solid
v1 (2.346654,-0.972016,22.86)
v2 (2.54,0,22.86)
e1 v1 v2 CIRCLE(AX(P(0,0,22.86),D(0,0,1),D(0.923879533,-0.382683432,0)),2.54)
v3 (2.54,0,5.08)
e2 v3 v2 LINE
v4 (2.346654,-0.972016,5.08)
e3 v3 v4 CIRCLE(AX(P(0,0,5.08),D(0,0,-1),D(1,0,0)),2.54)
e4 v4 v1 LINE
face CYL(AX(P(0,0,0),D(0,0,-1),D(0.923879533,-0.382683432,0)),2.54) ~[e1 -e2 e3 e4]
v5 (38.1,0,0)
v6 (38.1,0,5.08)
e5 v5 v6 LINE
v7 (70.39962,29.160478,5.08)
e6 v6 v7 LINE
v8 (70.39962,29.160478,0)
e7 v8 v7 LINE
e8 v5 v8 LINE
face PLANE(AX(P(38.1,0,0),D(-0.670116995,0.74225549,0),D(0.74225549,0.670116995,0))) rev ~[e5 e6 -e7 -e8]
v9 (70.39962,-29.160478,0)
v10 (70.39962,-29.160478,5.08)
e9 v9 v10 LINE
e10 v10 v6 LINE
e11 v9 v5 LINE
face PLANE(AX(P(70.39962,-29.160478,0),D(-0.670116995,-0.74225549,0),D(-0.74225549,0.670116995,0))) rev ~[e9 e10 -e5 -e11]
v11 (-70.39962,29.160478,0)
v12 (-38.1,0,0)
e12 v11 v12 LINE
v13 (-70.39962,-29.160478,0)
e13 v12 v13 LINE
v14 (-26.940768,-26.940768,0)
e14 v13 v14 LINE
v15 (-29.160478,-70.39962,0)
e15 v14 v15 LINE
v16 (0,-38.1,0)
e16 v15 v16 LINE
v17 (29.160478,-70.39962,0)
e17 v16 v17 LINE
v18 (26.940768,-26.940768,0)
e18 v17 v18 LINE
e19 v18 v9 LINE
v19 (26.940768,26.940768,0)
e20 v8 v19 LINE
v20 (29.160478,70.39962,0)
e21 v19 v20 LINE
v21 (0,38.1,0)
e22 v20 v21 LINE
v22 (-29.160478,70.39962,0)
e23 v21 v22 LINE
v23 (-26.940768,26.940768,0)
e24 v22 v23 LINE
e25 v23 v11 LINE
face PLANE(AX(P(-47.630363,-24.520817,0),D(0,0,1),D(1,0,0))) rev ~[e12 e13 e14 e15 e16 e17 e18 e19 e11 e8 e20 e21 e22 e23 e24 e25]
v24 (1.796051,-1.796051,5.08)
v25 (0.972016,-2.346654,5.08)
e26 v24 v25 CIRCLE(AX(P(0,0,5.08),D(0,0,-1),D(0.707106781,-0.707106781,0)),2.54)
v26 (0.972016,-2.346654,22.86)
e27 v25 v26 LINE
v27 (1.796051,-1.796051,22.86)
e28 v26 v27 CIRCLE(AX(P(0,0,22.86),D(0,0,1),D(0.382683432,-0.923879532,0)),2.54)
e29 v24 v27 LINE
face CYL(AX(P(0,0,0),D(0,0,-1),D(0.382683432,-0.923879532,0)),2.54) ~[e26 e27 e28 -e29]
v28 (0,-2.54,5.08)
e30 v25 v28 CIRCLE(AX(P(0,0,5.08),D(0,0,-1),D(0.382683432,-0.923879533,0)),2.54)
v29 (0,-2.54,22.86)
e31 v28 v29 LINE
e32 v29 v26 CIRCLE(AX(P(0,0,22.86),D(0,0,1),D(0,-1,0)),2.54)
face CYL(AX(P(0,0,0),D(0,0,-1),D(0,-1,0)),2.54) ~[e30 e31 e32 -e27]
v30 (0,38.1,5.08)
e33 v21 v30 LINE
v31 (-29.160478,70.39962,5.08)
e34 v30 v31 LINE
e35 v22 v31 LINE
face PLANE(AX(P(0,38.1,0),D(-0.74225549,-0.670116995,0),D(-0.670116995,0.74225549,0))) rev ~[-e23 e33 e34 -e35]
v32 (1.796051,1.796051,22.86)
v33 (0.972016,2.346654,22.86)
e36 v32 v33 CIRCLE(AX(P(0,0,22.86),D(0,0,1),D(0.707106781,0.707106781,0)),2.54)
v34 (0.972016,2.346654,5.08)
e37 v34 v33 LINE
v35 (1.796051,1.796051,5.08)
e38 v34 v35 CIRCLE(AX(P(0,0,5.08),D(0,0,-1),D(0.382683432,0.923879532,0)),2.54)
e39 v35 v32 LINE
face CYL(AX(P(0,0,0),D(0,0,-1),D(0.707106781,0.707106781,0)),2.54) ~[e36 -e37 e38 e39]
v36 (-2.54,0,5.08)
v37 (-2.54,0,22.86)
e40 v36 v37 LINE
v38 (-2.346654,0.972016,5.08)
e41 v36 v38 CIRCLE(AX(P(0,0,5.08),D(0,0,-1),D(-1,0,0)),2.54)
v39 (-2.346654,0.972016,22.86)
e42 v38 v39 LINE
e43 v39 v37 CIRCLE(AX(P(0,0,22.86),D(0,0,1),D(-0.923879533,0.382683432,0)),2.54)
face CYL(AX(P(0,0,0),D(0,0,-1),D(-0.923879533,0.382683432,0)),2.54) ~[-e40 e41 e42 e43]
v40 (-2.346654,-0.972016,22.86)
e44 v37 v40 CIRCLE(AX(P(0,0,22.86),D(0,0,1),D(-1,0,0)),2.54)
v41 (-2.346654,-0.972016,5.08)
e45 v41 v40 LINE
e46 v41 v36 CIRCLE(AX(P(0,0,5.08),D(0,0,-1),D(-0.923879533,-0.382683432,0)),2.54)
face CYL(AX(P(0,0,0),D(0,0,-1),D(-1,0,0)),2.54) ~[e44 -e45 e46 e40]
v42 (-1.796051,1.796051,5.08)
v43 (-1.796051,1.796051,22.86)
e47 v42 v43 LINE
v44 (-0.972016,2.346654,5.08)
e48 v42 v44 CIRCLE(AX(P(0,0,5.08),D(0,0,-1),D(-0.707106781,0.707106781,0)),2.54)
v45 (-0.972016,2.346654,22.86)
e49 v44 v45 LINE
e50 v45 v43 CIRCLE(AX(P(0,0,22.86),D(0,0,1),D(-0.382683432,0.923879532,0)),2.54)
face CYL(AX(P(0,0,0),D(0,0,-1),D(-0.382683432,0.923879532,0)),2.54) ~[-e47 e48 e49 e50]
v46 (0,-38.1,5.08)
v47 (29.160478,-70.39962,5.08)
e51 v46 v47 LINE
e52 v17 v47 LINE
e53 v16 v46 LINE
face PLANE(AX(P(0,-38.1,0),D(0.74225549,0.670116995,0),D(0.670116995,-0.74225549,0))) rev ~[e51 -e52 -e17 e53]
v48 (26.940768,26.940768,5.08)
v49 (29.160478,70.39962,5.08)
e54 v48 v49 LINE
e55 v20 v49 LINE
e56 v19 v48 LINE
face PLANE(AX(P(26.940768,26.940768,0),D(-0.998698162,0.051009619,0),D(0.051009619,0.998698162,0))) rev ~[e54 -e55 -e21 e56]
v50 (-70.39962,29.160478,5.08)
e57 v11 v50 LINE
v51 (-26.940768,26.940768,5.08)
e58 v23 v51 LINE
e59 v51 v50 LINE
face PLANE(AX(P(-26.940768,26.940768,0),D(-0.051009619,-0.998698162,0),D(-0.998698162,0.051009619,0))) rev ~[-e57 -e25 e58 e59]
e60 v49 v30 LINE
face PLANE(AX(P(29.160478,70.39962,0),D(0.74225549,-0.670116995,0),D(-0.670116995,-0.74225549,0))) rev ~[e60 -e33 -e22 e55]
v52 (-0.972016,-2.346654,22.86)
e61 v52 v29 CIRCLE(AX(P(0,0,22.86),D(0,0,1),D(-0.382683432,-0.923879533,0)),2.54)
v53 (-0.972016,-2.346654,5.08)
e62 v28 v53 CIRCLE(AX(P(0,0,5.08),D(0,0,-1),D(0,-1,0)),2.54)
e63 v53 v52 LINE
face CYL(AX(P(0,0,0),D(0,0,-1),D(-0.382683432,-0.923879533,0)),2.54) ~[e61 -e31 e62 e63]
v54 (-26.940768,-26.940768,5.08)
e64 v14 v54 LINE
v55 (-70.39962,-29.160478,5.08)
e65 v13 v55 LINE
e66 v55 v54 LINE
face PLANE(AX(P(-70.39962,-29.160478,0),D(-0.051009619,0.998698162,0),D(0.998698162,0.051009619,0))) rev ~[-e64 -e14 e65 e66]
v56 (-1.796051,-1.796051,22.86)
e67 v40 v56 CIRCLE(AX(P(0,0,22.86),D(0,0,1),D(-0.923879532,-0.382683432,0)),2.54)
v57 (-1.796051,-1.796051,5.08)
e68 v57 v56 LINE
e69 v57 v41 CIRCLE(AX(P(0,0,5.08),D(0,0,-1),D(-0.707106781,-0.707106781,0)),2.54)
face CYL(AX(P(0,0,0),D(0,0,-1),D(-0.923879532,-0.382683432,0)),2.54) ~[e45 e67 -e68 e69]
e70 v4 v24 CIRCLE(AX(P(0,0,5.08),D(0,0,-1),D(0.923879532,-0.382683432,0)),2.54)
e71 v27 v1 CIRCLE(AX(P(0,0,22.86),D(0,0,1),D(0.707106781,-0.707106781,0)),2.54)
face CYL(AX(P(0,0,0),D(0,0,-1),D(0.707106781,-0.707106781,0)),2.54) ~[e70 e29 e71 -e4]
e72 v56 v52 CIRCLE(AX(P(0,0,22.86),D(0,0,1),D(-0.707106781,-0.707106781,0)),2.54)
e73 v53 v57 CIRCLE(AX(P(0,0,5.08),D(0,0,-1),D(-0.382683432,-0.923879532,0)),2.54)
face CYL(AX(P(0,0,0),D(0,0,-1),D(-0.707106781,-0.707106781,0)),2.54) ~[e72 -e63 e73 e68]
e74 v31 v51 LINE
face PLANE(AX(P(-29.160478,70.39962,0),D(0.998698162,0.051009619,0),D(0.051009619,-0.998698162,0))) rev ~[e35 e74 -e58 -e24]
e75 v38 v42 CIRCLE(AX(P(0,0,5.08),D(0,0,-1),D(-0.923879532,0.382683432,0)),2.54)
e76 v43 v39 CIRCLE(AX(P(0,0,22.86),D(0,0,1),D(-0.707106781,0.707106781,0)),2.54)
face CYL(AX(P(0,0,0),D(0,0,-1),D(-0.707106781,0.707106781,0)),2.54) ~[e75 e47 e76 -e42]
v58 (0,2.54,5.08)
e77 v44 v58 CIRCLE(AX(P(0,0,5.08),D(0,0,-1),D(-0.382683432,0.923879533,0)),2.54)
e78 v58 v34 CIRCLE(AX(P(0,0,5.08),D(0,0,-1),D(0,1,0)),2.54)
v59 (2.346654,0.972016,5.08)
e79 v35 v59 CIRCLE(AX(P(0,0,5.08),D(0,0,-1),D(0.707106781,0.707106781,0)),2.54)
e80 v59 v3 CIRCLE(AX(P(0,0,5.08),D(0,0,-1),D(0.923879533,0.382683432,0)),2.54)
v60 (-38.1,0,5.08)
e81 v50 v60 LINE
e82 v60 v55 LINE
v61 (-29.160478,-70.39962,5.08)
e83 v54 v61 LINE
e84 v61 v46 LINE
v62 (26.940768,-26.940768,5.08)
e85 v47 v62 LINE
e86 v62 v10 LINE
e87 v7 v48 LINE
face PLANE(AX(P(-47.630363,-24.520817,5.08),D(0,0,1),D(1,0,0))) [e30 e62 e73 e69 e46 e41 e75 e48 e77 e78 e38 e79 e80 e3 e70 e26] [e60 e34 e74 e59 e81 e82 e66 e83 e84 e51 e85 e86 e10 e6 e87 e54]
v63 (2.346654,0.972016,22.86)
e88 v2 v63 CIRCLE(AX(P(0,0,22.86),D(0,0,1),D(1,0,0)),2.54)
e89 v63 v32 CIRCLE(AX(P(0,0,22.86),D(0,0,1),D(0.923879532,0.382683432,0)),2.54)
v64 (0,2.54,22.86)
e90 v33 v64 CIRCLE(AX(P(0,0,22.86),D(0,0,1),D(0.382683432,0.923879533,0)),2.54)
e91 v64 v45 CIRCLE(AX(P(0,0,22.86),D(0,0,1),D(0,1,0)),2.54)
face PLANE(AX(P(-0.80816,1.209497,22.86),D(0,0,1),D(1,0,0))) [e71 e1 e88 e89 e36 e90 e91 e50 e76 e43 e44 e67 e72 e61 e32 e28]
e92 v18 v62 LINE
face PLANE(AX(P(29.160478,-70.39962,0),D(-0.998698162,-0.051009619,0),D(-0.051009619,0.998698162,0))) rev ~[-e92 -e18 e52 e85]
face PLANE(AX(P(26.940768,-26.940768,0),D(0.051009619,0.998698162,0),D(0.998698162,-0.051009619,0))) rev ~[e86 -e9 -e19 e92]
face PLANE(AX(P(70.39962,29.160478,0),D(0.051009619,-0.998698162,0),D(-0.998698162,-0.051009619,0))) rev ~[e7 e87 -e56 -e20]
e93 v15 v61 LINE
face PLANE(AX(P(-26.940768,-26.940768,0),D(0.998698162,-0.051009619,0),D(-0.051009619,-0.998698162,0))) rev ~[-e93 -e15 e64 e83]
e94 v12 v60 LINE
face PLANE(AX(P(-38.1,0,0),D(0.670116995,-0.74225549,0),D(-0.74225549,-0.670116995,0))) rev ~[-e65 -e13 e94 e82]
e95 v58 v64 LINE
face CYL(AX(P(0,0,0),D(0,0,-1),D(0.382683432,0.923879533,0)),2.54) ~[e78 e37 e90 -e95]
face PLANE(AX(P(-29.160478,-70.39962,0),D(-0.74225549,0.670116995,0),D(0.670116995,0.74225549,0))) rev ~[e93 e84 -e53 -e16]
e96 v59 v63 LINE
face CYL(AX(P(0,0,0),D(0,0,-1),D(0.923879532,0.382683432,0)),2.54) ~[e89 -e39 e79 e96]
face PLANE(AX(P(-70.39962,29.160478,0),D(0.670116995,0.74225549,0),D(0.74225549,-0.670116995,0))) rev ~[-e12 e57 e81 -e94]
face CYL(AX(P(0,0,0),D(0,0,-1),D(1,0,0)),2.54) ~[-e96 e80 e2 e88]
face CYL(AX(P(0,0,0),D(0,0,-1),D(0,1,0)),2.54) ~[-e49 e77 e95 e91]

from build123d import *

# Parameters (mm, degrees)
F1_DEPTH = 5.08
F2_DEPTH = 22.86


# Not quite as in the source:
# - a feature names something its author has since deleted; it is built from what else it names


with BuildPart() as f1:
    # F0 (on Top) → F1 (new body)
    with BuildSketch(Plane.XY):
        with BuildLine():
            Line((-70.3996203774, -29.1604775462), (-26.9407683632, -26.9407683632))
            ThreePointArc((-26.9407683632, -26.9407683632), (-31.6789922287, -21.167225878), (-35.1998101887, -14.5802387731))
            Line((-35.1998101887, -14.5802387731), (-70.3996203774, -29.1604775462))
        make_face()
        with BuildLine():
            ThreePointArc((-35.1998101887, -14.5802387731), (-37.3679191834, -7.4329412688), (-38.1, 0))
            Line((-38.1, 0), (-70.3996203774, -29.1604775462))
            Line((-70.3996203774, -29.1604775462), (-35.1998101887, -14.5802387731))
        make_face()
        with BuildLine():
            Line((-70.3996203774, 29.1604775462), (-38.1, 0))
            ThreePointArc((-38.1, 0), (-37.3679191834, 7.4329412688), (-35.1998101887, 14.5802387731))
            Line((-35.1998101887, 14.5802387731), (-70.3996203774, 29.1604775462))
        make_face()
        with BuildLine():
            ThreePointArc((-35.1998101887, 14.5802387731), (-31.6789922287, 21.167225878), (-26.9407683632, 26.9407683632))
            Line((-26.9407683632, 26.9407683632), (-70.3996203774, 29.1604775462))
            Line((-70.3996203774, 29.1604775462), (-35.1998101887, 14.5802387731))
        make_face()
        with BuildLine():
            Line((-14.5802387731, 35.1998101887), (-29.1604775462, 70.3996203774))
            Line((-29.1604775462, 70.3996203774), (-26.9407683632, 26.9407683632))
            ThreePointArc((-26.9407683632, 26.9407683632), (-21.167225878, 31.6789922287), (-14.5802387731, 35.1998101887))
        make_face()
        with BuildLine():
            ThreePointArc((-14.5802387731, 35.1998101887), (-7.4329412688, 37.3679191834), (0, 38.1))
            Line((0, 38.1), (-29.1604775462, 70.3996203774))
            Line((-29.1604775462, 70.3996203774), (-14.5802387731, 35.1998101887))
        make_face()
        with BuildLine():
            Line((14.5802387731, 35.1998101887), (29.1604775462, 70.3996203774))
            Line((29.1604775462, 70.3996203774), (0, 38.1))
            ThreePointArc((0, 38.1), (7.4329412688, 37.3679191834), (14.5802387731, 35.1998101887))
        make_face()
        with BuildLine():
            ThreePointArc((14.5802387731, 35.1998101887), (21.167225878, 31.6789922287), (26.9407683632, 26.9407683632))
            Line((26.9407683632, 26.9407683632), (29.1604775462, 70.3996203774))
            Line((29.1604775462, 70.3996203774), (14.5802387731, 35.1998101887))
        make_face()
        with BuildLine():
            Line((38.1, 0), (70.3996203774, 29.1604775462))
            Line((70.3996203774, 29.1604775462), (35.1998101887, 14.5802387731))
            ThreePointArc((35.1998101887, 14.5802387731), (37.3679191834, 7.4329412688), (38.1, 0))
        make_face()
        with BuildLine():
            Line((35.1998101887, -14.5802387731), (70.3996203774, -29.1604775462))
            Line((70.3996203774, -29.1604775462), (38.1, 0))
            ThreePointArc((38.1, 0), (37.3679191834, -7.4329412688), (35.1998101887, -14.5802387731))
        make_face()
        with BuildLine():
            Line((26.9407683632, -26.9407683632), (70.3996203774, -29.1604775462))
            Line((70.3996203774, -29.1604775462), (35.1998101887, -14.5802387731))
            ThreePointArc((35.1998101887, -14.5802387731), (31.6789922287, -21.167225878), (26.9407683632, -26.9407683632))
        make_face()
        with BuildLine():
            Line((29.1604775462, -70.3996203774), (26.9407683632, -26.9407683632))
            ThreePointArc((26.9407683632, -26.9407683632), (21.167225878, -31.6789922287), (14.5802387731, -35.1998101887))
            Line((14.5802387731, -35.1998101887), (29.1604775462, -70.3996203774))
        make_face()
        with BuildLine():
            Line((0, -38.1), (29.1604775462, -70.3996203774))
            Line((29.1604775462, -70.3996203774), (14.5802387731, -35.1998101887))
            ThreePointArc((14.5802387731, -35.1998101887), (7.4329412688, -37.3679191834), (0, -38.1))
        make_face()
        with BuildLine():
            Line((-29.1604775462, -70.3996203774), (0, -38.1))
            ThreePointArc((0, -38.1), (-7.4329412688, -37.3679191834), (-14.5802387731, -35.1998101887))
            Line((-14.5802387731, -35.1998101887), (-29.1604775462, -70.3996203774))
        make_face()
        with BuildLine():
            Line((-26.9407683632, -26.9407683632), (-29.1604775462, -70.3996203774))
            Line((-29.1604775462, -70.3996203774), (-14.5802387731, -35.1998101887))
            ThreePointArc((-14.5802387731, -35.1998101887), (-21.167225878, -31.6789922287), (-26.9407683632, -26.9407683632))
        make_face()
        with BuildLine():
            ThreePointArc((-0.9720159182, -2.3466540126), (-1.4111483919, -2.1119328152), (-1.7960512242, -1.7960512242))
            Line((-1.7960512242, -1.7960512242), (-26.9407683632, -26.9407683632))
            ThreePointArc((-26.9407683632, -26.9407683632), (-21.167225878, -31.6789922287), (-14.5802387731, -35.1998101887))
            Line((-14.5802387731, -35.1998101887), (-0.9720159182, -2.3466540126))
        make_face()
        with BuildLine():
            ThreePointArc((-14.5802387731, -35.1998101887), (-7.4329412688, -37.3679191834), (0, -38.1))
            Line((0, -38.1), (0, -2.54))
            ThreePointArc((0, -2.54), (-0.4955294179, -2.4911946122), (-0.9720159182, -2.3466540126))
            Line((-0.9720159182, -2.3466540126), (-14.5802387731, -35.1998101887))
        make_face()
        with BuildLine():
            ThreePointArc((0, -38.1), (7.4329412688, -37.3679191834), (14.5802387731, -35.1998101887))
            Line((14.5802387731, -35.1998101887), (0.9720159182, -2.3466540126))
            ThreePointArc((0.9720159182, -2.3466540126), (0.4955294179, -2.4911946122), (0, -2.54))
            Line((0, -2.54), (0, -38.1))
        make_face()
        with BuildLine():
            ThreePointArc((14.5802387731, -35.1998101887), (21.167225878, -31.6789922287), (26.9407683632, -26.9407683632))
            Line((26.9407683632, -26.9407683632), (1.7960512242, -1.7960512242))
            ThreePointArc((1.7960512242, -1.7960512242), (1.4111483919, -2.1119328152), (0.9720159182, -2.3466540126))
            Line((0.9720159182, -2.3466540126), (14.5802387731, -35.1998101887))
        make_face()
        with BuildLine():
            ThreePointArc((26.9407683632, -26.9407683632), (31.6789922287, -21.167225878), (35.1998101887, -14.5802387731))
            Line((35.1998101887, -14.5802387731), (2.3466540126, -0.9720159182))
            ThreePointArc((2.3466540126, -0.9720159182), (2.1119328152, -1.4111483919), (1.7960512242, -1.7960512242))
            Line((1.7960512242, -1.7960512242), (26.9407683632, -26.9407683632))
        make_face()
        with BuildLine():
            ThreePointArc((35.1998101887, -14.5802387731), (37.3679191834, -7.4329412688), (38.1, 0))
            Line((38.1, 0), (2.54, 0))
            ThreePointArc((2.54, 0), (2.4911946122, -0.4955294179), (2.3466540126, -0.9720159182))
            Line((2.3466540126, -0.9720159182), (35.1998101887, -14.5802387731))
        make_face()
        with BuildLine():
            Line((2.54, 0), (38.1, 0))
            ThreePointArc((38.1, 0), (37.3679191834, 7.4329412688), (35.1998101887, 14.5802387731))
            Line((35.1998101887, 14.5802387731), (2.3466540126, 0.9720159182))
            ThreePointArc((2.3466540126, 0.9720159182), (2.4911946122, 0.4955294179), (2.54, 0))
        make_face()
        with BuildLine():
            Line((2.3466540126, 0.9720159182), (35.1998101887, 14.5802387731))
            ThreePointArc((35.1998101887, 14.5802387731), (31.6789922287, 21.167225878), (26.9407683632, 26.9407683632))
            Line((26.9407683632, 26.9407683632), (1.7960512242, 1.7960512242))
            ThreePointArc((1.7960512242, 1.7960512242), (2.1119328152, 1.4111483919), (2.3466540126, 0.9720159182))
        make_face()
        with BuildLine():
            Line((1.7960512242, 1.7960512242), (26.9407683632, 26.9407683632))
            ThreePointArc((26.9407683632, 26.9407683632), (21.167225878, 31.6789922287), (14.5802387731, 35.1998101887))
            Line((14.5802387731, 35.1998101887), (0.9720159182, 2.3466540126))
            ThreePointArc((0.9720159182, 2.3466540126), (1.4111483919, 2.1119328152), (1.7960512242, 1.7960512242))
        make_face()
        with BuildLine():
            Line((0.9720159182, 2.3466540126), (14.5802387731, 35.1998101887))
            ThreePointArc((14.5802387731, 35.1998101887), (7.4329412688, 37.3679191834), (0, 38.1))
            Line((0, 38.1), (0, 2.54))
            ThreePointArc((0, 2.54), (0.4955294179, 2.4911946122), (0.9720159182, 2.3466540126))
        make_face()
        with BuildLine():
            Line((0, 2.54), (0, 38.1))
            ThreePointArc((0, 38.1), (-7.4329412688, 37.3679191834), (-14.5802387731, 35.1998101887))
            Line((-14.5802387731, 35.1998101887), (-0.9720159182, 2.3466540126))
            ThreePointArc((-0.9720159182, 2.3466540126), (-0.4955294179, 2.4911946122), (0, 2.54))
        make_face()
        with BuildLine():
            Line((-26.9407683632, 26.9407683632), (-1.7960512242, 1.7960512242))
            ThreePointArc((-1.7960512242, 1.7960512242), (-1.4111483919, 2.1119328152), (-0.9720159182, 2.3466540126))
            Line((-0.9720159182, 2.3466540126), (-14.5802387731, 35.1998101887))
            ThreePointArc((-14.5802387731, 35.1998101887), (-21.167225878, 31.6789922287), (-26.9407683632, 26.9407683632))
        make_face()
        with BuildLine():
            ThreePointArc((-2.3466540126, 0.9720159182), (-2.1119328152, 1.4111483919), (-1.7960512242, 1.7960512242))
            Line((-1.7960512242, 1.7960512242), (-26.9407683632, 26.9407683632))
            ThreePointArc((-26.9407683632, 26.9407683632), (-31.6789922287, 21.167225878), (-35.1998101887, 14.5802387731))
            Line((-35.1998101887, 14.5802387731), (-2.3466540126, 0.9720159182))
        make_face()
        with BuildLine():
            Line((-38.1, 0), (-2.54, 0))
            ThreePointArc((-2.54, 0), (-2.4911946122, 0.4955294179), (-2.3466540126, 0.9720159182))
            Line((-2.3466540126, 0.9720159182), (-35.1998101887, 14.5802387731))
            ThreePointArc((-35.1998101887, 14.5802387731), (-37.3679191834, 7.4329412688), (-38.1, 0))
        make_face()
        with BuildLine():
            ThreePointArc((-2.3466540126, -0.9720159182), (-2.4911946122, -0.4955294179), (-2.54, 0))
            Line((-2.54, 0), (-38.1, 0))
            ThreePointArc((-38.1, 0), (-37.3679191834, -7.4329412688), (-35.1998101887, -14.5802387731))
            Line((-35.1998101887, -14.5802387731), (-2.3466540126, -0.9720159182))
        make_face()
        with BuildLine():
            Line((-26.9407683632, -26.9407683632), (-1.7960512242, -1.7960512242))
            ThreePointArc((-1.7960512242, -1.7960512242), (-2.1119328152, -1.4111483919), (-2.3466540126, -0.9720159182))
            Line((-2.3466540126, -0.9720159182), (-35.1998101887, -14.5802387731))
            ThreePointArc((-35.1998101887, -14.5802387731), (-31.6789922287, -21.167225878), (-26.9407683632, -26.9407683632))
        make_face()
        with BuildLine():
            Line((35.1998101887, 14.5802387731), (70.3996203774, 29.1604775462))
            Line((70.3996203774, 29.1604775462), (26.9407683632, 26.9407683632))
            ThreePointArc((26.9407683632, 26.9407683632), (31.6789922287, 21.167225878), (35.1998101887, 14.5802387731))
        make_face()
    extrude(amount=F1_DEPTH)

    # F0 (on Top) → F2 (join)
    with BuildSketch(Plane.XY):
        with BuildLine():
            Line((-1.7960512242, 1.7960512242), (0, 0))
            Line((0, 0), (-0.9720159182, 2.3466540126))
            ThreePointArc((-0.9720159182, 2.3466540126), (-1.4111483919, 2.1119328152), (-1.7960512242, 1.7960512242))
        make_face()
        with BuildLine():
            Line((-2.3466540126, 0.9720159182), (0, 0))
            Line((0, 0), (-1.7960512242, 1.7960512242))
            ThreePointArc((-1.7960512242, 1.7960512242), (-2.1119328152, 1.4111483919), (-2.3466540126, 0.9720159182))
        make_face()
        with BuildLine():
            Line((-2.54, 0), (0, 0))
            Line((0, 0), (-2.3466540126, 0.9720159182))
            ThreePointArc((-2.3466540126, 0.9720159182), (-2.4911946122, 0.4955294179), (-2.54, 0))
        make_face()
        with BuildLine():
            Line((-2.3466540126, -0.9720159182), (0, 0))
            Line((0, 0), (-2.54, 0))
            ThreePointArc((-2.54, 0), (-2.4911946122, -0.4955294179), (-2.3466540126, -0.9720159182))
        make_face()
        with BuildLine():
            Line((-1.7960512242, -1.7960512242), (0, 0))
            Line((0, 0), (-2.3466540126, -0.9720159182))
            ThreePointArc((-2.3466540126, -0.9720159182), (-2.1119328152, -1.4111483919), (-1.7960512242, -1.7960512242))
        make_face()
        with BuildLine():
            Line((-0.9720159182, -2.3466540126), (0, 0))
            Line((0, 0), (-1.7960512242, -1.7960512242))
            ThreePointArc((-1.7960512242, -1.7960512242), (-1.4111483919, -2.1119328152), (-0.9720159182, -2.3466540126))
        make_face()
        with BuildLine():
            Line((0, -2.54), (0, 0))
            Line((0, 0), (-0.9720159182, -2.3466540126))
            ThreePointArc((-0.9720159182, -2.3466540126), (-0.4955294179, -2.4911946122), (0, -2.54))
        make_face()
        with BuildLine():
            Line((0.9720159182, -2.3466540126), (0, 0))
            Line((0, 0), (0, -2.54))
            ThreePointArc((0, -2.54), (0.4955294179, -2.4911946122), (0.9720159182, -2.3466540126))
        make_face()
        with BuildLine():
            ThreePointArc((0.9720159182, -2.3466540126), (1.4111483919, -2.1119328152), (1.7960512242, -1.7960512242))
            Line((1.7960512242, -1.7960512242), (0, 0))
            Line((0, 0), (0.9720159182, -2.3466540126))
        make_face()
        with BuildLine():
            ThreePointArc((1.7960512242, -1.7960512242), (2.1119328152, -1.4111483919), (2.3466540126, -0.9720159182))
            Line((2.3466540126, -0.9720159182), (0, 0))
            Line((0, 0), (1.7960512242, -1.7960512242))
        make_face()
        with BuildLine():
            ThreePointArc((2.3466540126, -0.9720159182), (2.4911946122, -0.4955294179), (2.54, 0))
            Line((2.54, 0), (0, 0))
            Line((0, 0), (2.3466540126, -0.9720159182))
        make_face()
        with BuildLine():
            Line((0, 0), (2.54, 0))
            ThreePointArc((2.54, 0), (2.4911946122, 0.4955294179), (2.3466540126, 0.9720159182))
            Line((2.3466540126, 0.9720159182), (0, 0))
        make_face()
        with BuildLine():
            Line((0, 0), (2.3466540126, 0.9720159182))
            ThreePointArc((2.3466540126, 0.9720159182), (2.1119328152, 1.4111483919), (1.7960512242, 1.7960512242))
            Line((1.7960512242, 1.7960512242), (0, 0))
        make_face()
        with BuildLine():
            Line((0, 2.54), (0, 0))
            Line((0, 0), (0.9720159182, 2.3466540126))
            ThreePointArc((0.9720159182, 2.3466540126), (0.4955294179, 2.4911946122), (0, 2.54))
        make_face()
        with BuildLine():
            Line((-0.9720159182, 2.3466540126), (0, 0))
            Line((0, 0), (0, 2.54))
            ThreePointArc((0, 2.54), (-0.4955294179, 2.4911946122), (-0.9720159182, 2.3466540126))
        make_face()
        with BuildLine():
            Line((0, 0), (1.7960512242, 1.7960512242))
            ThreePointArc((1.7960512242, 1.7960512242), (1.4111483919, 2.1119328152), (0.9720159182, 2.3466540126))
            Line((0.9720159182, 2.3466540126), (0, 0))
        make_face()
    extrude(amount=F2_DEPTH)


solid = f1.part
